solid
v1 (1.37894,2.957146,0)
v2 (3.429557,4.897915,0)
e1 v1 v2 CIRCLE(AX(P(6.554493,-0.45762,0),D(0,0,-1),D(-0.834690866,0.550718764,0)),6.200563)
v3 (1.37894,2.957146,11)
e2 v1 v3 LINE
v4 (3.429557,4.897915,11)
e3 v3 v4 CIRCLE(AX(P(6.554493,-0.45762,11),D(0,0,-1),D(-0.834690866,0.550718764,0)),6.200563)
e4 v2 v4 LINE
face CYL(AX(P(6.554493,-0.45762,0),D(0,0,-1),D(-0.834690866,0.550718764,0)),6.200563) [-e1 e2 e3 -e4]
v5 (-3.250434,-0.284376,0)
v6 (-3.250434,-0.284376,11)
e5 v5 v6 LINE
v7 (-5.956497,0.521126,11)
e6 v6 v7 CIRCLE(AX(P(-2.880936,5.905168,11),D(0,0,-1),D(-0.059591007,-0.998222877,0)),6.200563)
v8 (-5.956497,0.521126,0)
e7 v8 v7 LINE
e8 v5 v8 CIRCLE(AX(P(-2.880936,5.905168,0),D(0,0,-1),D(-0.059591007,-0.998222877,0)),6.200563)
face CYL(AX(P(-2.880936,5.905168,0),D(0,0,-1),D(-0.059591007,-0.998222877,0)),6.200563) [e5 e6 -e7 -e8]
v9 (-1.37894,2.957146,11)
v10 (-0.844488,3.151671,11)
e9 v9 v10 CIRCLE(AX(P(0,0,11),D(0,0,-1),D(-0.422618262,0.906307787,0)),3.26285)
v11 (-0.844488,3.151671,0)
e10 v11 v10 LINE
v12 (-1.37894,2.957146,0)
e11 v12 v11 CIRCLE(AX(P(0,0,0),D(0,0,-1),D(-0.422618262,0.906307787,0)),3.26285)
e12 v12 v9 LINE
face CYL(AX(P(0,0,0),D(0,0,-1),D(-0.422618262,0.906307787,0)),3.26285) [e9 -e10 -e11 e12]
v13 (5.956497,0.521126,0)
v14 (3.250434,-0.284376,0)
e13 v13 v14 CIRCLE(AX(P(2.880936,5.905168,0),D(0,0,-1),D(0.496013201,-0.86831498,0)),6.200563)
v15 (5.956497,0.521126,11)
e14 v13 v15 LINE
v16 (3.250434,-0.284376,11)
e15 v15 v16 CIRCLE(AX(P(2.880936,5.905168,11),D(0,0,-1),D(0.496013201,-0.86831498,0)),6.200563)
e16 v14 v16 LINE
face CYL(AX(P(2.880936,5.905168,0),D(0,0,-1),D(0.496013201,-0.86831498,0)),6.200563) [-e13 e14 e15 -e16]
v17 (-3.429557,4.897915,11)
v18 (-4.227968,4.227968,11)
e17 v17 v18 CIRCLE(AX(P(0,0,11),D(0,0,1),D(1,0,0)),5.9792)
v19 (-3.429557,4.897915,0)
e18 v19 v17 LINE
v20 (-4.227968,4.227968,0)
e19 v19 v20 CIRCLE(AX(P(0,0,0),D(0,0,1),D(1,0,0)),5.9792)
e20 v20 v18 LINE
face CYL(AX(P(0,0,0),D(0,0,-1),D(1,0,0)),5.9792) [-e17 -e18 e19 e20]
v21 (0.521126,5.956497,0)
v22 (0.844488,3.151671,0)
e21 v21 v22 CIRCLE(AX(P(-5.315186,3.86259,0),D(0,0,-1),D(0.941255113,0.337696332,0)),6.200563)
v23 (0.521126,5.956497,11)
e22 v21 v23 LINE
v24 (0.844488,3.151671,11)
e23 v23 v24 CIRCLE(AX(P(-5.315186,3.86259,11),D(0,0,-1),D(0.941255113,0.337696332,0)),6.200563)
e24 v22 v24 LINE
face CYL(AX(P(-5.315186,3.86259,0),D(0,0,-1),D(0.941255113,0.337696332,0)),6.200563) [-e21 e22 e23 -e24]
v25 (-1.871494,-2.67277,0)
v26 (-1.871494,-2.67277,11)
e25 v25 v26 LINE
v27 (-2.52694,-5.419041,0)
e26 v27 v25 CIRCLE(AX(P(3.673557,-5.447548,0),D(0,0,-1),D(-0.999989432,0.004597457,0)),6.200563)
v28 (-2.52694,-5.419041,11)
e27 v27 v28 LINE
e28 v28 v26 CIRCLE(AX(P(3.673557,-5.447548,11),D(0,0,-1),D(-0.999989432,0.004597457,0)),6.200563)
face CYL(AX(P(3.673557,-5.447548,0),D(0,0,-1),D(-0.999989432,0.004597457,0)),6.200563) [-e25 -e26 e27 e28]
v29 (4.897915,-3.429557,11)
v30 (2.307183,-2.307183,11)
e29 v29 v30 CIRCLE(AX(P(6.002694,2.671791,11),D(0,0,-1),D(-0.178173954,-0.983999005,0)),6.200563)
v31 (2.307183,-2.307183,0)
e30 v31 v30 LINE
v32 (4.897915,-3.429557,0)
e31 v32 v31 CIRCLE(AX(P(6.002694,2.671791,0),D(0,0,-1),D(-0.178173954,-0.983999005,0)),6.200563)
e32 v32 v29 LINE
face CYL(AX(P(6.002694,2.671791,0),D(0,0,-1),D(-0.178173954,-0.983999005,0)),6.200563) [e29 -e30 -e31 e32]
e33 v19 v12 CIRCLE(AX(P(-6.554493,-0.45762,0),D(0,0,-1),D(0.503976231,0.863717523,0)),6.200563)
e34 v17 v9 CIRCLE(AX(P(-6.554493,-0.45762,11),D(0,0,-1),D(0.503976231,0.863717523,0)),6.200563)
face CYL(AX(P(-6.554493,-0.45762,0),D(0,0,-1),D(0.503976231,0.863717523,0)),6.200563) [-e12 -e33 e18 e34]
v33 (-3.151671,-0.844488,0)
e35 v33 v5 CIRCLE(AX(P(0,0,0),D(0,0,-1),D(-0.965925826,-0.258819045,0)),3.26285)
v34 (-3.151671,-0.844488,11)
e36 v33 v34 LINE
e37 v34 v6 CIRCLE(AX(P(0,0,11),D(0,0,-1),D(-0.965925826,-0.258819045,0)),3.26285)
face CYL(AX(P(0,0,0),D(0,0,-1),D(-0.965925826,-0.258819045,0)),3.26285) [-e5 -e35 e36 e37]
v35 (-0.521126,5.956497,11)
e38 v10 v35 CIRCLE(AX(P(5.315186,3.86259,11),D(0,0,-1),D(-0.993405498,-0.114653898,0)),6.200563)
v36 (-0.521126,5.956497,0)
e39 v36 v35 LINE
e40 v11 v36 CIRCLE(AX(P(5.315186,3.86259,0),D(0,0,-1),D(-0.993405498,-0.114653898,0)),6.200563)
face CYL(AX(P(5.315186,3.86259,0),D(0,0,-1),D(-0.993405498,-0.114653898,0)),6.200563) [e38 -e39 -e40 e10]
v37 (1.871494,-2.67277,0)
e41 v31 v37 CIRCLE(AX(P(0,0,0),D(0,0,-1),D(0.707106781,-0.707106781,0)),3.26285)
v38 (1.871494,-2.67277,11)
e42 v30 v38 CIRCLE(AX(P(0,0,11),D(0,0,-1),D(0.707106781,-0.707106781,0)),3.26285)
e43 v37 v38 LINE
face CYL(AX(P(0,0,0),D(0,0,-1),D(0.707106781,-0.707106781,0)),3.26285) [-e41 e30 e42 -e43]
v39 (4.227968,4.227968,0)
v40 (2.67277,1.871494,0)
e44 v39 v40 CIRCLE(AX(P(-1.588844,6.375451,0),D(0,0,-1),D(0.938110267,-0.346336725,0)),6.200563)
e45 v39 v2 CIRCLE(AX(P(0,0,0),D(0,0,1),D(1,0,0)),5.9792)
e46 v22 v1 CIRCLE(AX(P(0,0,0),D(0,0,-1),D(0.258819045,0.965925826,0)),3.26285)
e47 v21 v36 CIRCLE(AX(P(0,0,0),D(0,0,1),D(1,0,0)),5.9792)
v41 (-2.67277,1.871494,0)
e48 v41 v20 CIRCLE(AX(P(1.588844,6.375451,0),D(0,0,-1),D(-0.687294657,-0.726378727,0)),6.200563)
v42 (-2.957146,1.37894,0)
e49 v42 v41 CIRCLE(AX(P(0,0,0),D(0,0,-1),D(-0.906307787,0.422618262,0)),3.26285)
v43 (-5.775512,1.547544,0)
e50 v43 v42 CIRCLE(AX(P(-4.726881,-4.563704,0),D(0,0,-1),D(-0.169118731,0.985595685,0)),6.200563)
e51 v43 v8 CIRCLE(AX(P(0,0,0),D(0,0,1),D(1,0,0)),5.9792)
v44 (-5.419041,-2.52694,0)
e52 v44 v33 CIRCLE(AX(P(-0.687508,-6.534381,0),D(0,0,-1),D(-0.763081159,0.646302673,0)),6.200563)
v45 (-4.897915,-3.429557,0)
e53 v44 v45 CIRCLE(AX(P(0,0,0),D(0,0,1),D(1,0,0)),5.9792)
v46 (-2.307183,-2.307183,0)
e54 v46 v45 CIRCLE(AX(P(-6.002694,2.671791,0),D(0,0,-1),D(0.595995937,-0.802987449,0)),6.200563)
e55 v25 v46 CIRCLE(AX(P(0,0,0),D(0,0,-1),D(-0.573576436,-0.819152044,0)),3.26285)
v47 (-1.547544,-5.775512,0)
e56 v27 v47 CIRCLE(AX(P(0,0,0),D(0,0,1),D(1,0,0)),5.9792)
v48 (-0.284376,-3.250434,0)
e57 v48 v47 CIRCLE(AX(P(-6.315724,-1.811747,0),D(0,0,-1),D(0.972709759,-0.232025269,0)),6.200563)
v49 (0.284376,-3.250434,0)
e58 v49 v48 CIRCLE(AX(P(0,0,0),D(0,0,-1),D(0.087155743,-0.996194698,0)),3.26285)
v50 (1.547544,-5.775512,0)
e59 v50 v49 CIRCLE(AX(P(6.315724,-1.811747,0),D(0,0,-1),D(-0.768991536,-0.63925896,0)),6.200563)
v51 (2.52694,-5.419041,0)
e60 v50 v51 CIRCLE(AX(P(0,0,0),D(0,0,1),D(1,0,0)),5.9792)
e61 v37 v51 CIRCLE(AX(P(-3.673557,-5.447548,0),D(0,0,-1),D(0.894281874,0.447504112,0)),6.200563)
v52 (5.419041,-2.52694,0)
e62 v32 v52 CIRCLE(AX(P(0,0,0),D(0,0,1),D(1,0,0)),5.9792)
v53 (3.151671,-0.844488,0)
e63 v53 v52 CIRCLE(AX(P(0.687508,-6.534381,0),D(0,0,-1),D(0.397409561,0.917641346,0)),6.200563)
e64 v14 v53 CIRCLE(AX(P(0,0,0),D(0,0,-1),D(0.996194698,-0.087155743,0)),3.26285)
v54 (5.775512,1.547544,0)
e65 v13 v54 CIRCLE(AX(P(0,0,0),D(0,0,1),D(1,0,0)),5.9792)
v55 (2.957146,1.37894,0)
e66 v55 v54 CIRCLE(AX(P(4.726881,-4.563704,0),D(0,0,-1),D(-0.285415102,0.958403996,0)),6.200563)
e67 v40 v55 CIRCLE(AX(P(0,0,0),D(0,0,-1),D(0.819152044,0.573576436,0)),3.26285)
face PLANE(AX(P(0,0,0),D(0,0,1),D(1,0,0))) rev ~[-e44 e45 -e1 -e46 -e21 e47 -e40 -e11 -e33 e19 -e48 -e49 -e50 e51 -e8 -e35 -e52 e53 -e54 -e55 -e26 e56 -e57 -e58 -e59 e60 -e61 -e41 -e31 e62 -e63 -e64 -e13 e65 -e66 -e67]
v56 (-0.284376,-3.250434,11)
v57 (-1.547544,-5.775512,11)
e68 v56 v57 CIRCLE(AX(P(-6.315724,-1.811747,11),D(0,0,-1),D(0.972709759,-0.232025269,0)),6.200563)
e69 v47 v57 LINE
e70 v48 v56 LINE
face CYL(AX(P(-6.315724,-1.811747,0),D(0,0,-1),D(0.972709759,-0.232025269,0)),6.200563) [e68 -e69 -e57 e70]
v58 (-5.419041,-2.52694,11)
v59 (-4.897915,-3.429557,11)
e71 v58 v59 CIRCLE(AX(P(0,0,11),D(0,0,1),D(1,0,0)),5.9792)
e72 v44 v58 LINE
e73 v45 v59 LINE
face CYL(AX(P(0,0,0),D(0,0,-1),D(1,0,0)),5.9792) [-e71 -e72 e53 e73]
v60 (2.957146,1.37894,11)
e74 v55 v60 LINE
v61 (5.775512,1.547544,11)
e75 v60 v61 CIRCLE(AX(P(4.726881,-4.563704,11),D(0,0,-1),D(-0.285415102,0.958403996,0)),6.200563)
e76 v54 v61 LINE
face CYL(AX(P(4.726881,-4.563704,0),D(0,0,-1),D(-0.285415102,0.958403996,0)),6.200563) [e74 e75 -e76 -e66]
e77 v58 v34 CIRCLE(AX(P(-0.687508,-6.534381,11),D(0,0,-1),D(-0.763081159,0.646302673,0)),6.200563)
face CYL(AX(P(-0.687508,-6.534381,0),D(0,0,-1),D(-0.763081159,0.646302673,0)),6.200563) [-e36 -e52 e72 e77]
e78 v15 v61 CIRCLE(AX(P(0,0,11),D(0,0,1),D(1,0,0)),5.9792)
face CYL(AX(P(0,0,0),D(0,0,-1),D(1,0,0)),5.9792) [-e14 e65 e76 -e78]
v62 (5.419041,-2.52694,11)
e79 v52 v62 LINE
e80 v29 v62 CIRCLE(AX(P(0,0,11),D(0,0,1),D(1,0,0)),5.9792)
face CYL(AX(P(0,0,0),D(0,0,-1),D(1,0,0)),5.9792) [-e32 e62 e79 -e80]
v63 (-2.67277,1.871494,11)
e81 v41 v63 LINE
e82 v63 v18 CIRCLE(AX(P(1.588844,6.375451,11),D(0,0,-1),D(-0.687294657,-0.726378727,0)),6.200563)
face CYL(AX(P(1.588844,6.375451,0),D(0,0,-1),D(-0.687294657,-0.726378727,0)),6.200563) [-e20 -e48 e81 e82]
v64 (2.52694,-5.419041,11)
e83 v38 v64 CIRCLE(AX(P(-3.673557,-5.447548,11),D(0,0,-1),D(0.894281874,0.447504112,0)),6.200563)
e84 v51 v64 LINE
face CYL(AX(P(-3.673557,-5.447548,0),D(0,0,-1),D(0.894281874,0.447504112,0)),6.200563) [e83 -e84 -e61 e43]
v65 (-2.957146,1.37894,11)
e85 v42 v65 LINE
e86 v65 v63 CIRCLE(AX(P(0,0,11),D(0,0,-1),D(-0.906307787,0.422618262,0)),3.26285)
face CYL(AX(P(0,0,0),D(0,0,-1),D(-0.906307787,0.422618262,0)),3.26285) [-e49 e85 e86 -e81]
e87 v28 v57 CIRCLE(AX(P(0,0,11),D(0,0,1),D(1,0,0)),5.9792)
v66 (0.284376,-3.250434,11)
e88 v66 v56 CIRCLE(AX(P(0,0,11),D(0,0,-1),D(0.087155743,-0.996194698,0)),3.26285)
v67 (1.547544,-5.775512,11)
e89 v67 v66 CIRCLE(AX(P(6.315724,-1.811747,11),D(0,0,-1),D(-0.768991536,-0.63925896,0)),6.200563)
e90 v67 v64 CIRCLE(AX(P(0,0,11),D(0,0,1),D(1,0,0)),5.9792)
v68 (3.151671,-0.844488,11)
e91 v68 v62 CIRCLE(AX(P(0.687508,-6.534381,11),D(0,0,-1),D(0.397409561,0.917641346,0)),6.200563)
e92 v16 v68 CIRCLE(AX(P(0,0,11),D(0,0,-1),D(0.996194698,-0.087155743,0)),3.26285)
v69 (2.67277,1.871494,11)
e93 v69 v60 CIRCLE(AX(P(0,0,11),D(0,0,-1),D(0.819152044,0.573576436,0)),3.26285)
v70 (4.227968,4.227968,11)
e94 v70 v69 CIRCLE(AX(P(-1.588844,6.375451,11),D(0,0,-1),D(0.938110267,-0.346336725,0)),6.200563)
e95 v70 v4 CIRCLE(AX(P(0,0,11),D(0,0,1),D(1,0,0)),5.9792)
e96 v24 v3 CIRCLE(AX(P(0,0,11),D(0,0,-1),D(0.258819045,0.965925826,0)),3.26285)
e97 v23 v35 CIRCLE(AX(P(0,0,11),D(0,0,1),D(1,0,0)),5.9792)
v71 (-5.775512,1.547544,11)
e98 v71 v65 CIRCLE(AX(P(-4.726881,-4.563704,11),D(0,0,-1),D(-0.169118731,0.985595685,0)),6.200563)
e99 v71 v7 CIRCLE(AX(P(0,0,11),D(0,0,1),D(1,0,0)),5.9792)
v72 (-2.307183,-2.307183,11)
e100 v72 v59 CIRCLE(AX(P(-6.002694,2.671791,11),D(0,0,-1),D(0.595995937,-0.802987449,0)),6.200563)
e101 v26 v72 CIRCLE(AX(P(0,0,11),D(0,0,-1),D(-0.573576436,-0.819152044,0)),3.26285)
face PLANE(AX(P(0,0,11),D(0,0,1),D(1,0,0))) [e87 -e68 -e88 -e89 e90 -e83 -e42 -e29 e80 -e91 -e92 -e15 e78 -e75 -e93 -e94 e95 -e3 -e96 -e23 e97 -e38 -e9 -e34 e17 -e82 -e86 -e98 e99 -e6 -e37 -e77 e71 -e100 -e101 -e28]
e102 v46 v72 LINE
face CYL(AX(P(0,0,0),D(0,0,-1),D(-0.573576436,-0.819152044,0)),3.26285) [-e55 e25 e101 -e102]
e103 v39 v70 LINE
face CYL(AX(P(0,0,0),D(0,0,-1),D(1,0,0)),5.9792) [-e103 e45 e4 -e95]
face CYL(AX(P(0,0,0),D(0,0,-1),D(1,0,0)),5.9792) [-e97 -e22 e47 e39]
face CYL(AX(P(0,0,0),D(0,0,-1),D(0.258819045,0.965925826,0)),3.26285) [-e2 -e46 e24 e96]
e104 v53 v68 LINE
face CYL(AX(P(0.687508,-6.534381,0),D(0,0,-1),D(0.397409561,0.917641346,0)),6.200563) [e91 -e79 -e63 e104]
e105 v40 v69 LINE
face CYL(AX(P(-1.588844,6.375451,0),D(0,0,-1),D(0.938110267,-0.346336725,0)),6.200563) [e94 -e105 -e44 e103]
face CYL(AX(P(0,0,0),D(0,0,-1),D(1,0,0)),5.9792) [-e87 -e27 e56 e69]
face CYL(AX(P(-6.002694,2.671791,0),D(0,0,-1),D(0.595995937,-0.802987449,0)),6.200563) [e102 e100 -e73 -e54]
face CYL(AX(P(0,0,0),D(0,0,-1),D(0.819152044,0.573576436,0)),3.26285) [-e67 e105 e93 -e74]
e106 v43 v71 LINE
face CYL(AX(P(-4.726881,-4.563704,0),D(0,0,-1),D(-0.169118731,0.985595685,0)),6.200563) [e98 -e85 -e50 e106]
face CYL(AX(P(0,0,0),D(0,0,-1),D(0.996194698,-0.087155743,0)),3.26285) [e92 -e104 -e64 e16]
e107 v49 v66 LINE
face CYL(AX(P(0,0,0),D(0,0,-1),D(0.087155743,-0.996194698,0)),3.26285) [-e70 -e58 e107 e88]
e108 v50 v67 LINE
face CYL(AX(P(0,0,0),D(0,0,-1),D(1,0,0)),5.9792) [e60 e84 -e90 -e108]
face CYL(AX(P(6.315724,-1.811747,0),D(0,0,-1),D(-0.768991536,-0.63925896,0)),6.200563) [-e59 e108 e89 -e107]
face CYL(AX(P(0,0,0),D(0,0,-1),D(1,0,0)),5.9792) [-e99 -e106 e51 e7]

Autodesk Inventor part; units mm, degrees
sketch "Sketch1" plane through (0, 0, 0) normal (0, 0, 1) x (1, 0, 0)
  circle A0 centre (0, 0) radius 5.9792
  dimension "d0" = 11.9585
extrude "Extrusion1" add sketch "Sketch1" along normal blind 11
ref_plane "Work Plane2" through (0, 0, 5.5) normal (0, 0, 1) x (1, 0, 0)
sketch "Sketch2" plane through (0, 0, 0) normal (0, 0, -1) x (-1, 0, 0)
  circle A0 centre (0, 0) radius 5.9792 projected
  circle A1 centre (0, 0) radius 5.15
  dimension "d3" = 10.3
surface extrude "Pitch Diameter" sketch "Sketch2" against normal through all shown no curves A1
ref_plane "Work Plane8" through (0, 0, 0) normal (0.9396926, 0.3420201, 0) x (0, 0, 1)
ref_plane "Work Plane9" through (0, 0, 0) normal (1, 0, 0) x (0, 1, 0)
spur gear teeth "Spur Gear" teeth 9 pitch diameter 11.25 tip diameter 11.9585 root diameter 6.5257 face width 11 start plane through (0, 0, 0) normal (0, 0, -1) x (-1, 0, 0)
equation "\"d0\" = da_da"
equation "\"d1\" = da_b"
equation "\"d3\" = da_dw"
equation "\"d16\" = da_aw"
equation "\"d43\" = da_aw"
equation "\"d46\" = da_aw"
equation "\"da_da\" = 11.958458"
equation "\"da_b\" = 11"
equation "\"da_dw\" = 10.3"
equation "\"da_aw\" = 10.3"
properties part number "Spur Gear2" material "Steel"
